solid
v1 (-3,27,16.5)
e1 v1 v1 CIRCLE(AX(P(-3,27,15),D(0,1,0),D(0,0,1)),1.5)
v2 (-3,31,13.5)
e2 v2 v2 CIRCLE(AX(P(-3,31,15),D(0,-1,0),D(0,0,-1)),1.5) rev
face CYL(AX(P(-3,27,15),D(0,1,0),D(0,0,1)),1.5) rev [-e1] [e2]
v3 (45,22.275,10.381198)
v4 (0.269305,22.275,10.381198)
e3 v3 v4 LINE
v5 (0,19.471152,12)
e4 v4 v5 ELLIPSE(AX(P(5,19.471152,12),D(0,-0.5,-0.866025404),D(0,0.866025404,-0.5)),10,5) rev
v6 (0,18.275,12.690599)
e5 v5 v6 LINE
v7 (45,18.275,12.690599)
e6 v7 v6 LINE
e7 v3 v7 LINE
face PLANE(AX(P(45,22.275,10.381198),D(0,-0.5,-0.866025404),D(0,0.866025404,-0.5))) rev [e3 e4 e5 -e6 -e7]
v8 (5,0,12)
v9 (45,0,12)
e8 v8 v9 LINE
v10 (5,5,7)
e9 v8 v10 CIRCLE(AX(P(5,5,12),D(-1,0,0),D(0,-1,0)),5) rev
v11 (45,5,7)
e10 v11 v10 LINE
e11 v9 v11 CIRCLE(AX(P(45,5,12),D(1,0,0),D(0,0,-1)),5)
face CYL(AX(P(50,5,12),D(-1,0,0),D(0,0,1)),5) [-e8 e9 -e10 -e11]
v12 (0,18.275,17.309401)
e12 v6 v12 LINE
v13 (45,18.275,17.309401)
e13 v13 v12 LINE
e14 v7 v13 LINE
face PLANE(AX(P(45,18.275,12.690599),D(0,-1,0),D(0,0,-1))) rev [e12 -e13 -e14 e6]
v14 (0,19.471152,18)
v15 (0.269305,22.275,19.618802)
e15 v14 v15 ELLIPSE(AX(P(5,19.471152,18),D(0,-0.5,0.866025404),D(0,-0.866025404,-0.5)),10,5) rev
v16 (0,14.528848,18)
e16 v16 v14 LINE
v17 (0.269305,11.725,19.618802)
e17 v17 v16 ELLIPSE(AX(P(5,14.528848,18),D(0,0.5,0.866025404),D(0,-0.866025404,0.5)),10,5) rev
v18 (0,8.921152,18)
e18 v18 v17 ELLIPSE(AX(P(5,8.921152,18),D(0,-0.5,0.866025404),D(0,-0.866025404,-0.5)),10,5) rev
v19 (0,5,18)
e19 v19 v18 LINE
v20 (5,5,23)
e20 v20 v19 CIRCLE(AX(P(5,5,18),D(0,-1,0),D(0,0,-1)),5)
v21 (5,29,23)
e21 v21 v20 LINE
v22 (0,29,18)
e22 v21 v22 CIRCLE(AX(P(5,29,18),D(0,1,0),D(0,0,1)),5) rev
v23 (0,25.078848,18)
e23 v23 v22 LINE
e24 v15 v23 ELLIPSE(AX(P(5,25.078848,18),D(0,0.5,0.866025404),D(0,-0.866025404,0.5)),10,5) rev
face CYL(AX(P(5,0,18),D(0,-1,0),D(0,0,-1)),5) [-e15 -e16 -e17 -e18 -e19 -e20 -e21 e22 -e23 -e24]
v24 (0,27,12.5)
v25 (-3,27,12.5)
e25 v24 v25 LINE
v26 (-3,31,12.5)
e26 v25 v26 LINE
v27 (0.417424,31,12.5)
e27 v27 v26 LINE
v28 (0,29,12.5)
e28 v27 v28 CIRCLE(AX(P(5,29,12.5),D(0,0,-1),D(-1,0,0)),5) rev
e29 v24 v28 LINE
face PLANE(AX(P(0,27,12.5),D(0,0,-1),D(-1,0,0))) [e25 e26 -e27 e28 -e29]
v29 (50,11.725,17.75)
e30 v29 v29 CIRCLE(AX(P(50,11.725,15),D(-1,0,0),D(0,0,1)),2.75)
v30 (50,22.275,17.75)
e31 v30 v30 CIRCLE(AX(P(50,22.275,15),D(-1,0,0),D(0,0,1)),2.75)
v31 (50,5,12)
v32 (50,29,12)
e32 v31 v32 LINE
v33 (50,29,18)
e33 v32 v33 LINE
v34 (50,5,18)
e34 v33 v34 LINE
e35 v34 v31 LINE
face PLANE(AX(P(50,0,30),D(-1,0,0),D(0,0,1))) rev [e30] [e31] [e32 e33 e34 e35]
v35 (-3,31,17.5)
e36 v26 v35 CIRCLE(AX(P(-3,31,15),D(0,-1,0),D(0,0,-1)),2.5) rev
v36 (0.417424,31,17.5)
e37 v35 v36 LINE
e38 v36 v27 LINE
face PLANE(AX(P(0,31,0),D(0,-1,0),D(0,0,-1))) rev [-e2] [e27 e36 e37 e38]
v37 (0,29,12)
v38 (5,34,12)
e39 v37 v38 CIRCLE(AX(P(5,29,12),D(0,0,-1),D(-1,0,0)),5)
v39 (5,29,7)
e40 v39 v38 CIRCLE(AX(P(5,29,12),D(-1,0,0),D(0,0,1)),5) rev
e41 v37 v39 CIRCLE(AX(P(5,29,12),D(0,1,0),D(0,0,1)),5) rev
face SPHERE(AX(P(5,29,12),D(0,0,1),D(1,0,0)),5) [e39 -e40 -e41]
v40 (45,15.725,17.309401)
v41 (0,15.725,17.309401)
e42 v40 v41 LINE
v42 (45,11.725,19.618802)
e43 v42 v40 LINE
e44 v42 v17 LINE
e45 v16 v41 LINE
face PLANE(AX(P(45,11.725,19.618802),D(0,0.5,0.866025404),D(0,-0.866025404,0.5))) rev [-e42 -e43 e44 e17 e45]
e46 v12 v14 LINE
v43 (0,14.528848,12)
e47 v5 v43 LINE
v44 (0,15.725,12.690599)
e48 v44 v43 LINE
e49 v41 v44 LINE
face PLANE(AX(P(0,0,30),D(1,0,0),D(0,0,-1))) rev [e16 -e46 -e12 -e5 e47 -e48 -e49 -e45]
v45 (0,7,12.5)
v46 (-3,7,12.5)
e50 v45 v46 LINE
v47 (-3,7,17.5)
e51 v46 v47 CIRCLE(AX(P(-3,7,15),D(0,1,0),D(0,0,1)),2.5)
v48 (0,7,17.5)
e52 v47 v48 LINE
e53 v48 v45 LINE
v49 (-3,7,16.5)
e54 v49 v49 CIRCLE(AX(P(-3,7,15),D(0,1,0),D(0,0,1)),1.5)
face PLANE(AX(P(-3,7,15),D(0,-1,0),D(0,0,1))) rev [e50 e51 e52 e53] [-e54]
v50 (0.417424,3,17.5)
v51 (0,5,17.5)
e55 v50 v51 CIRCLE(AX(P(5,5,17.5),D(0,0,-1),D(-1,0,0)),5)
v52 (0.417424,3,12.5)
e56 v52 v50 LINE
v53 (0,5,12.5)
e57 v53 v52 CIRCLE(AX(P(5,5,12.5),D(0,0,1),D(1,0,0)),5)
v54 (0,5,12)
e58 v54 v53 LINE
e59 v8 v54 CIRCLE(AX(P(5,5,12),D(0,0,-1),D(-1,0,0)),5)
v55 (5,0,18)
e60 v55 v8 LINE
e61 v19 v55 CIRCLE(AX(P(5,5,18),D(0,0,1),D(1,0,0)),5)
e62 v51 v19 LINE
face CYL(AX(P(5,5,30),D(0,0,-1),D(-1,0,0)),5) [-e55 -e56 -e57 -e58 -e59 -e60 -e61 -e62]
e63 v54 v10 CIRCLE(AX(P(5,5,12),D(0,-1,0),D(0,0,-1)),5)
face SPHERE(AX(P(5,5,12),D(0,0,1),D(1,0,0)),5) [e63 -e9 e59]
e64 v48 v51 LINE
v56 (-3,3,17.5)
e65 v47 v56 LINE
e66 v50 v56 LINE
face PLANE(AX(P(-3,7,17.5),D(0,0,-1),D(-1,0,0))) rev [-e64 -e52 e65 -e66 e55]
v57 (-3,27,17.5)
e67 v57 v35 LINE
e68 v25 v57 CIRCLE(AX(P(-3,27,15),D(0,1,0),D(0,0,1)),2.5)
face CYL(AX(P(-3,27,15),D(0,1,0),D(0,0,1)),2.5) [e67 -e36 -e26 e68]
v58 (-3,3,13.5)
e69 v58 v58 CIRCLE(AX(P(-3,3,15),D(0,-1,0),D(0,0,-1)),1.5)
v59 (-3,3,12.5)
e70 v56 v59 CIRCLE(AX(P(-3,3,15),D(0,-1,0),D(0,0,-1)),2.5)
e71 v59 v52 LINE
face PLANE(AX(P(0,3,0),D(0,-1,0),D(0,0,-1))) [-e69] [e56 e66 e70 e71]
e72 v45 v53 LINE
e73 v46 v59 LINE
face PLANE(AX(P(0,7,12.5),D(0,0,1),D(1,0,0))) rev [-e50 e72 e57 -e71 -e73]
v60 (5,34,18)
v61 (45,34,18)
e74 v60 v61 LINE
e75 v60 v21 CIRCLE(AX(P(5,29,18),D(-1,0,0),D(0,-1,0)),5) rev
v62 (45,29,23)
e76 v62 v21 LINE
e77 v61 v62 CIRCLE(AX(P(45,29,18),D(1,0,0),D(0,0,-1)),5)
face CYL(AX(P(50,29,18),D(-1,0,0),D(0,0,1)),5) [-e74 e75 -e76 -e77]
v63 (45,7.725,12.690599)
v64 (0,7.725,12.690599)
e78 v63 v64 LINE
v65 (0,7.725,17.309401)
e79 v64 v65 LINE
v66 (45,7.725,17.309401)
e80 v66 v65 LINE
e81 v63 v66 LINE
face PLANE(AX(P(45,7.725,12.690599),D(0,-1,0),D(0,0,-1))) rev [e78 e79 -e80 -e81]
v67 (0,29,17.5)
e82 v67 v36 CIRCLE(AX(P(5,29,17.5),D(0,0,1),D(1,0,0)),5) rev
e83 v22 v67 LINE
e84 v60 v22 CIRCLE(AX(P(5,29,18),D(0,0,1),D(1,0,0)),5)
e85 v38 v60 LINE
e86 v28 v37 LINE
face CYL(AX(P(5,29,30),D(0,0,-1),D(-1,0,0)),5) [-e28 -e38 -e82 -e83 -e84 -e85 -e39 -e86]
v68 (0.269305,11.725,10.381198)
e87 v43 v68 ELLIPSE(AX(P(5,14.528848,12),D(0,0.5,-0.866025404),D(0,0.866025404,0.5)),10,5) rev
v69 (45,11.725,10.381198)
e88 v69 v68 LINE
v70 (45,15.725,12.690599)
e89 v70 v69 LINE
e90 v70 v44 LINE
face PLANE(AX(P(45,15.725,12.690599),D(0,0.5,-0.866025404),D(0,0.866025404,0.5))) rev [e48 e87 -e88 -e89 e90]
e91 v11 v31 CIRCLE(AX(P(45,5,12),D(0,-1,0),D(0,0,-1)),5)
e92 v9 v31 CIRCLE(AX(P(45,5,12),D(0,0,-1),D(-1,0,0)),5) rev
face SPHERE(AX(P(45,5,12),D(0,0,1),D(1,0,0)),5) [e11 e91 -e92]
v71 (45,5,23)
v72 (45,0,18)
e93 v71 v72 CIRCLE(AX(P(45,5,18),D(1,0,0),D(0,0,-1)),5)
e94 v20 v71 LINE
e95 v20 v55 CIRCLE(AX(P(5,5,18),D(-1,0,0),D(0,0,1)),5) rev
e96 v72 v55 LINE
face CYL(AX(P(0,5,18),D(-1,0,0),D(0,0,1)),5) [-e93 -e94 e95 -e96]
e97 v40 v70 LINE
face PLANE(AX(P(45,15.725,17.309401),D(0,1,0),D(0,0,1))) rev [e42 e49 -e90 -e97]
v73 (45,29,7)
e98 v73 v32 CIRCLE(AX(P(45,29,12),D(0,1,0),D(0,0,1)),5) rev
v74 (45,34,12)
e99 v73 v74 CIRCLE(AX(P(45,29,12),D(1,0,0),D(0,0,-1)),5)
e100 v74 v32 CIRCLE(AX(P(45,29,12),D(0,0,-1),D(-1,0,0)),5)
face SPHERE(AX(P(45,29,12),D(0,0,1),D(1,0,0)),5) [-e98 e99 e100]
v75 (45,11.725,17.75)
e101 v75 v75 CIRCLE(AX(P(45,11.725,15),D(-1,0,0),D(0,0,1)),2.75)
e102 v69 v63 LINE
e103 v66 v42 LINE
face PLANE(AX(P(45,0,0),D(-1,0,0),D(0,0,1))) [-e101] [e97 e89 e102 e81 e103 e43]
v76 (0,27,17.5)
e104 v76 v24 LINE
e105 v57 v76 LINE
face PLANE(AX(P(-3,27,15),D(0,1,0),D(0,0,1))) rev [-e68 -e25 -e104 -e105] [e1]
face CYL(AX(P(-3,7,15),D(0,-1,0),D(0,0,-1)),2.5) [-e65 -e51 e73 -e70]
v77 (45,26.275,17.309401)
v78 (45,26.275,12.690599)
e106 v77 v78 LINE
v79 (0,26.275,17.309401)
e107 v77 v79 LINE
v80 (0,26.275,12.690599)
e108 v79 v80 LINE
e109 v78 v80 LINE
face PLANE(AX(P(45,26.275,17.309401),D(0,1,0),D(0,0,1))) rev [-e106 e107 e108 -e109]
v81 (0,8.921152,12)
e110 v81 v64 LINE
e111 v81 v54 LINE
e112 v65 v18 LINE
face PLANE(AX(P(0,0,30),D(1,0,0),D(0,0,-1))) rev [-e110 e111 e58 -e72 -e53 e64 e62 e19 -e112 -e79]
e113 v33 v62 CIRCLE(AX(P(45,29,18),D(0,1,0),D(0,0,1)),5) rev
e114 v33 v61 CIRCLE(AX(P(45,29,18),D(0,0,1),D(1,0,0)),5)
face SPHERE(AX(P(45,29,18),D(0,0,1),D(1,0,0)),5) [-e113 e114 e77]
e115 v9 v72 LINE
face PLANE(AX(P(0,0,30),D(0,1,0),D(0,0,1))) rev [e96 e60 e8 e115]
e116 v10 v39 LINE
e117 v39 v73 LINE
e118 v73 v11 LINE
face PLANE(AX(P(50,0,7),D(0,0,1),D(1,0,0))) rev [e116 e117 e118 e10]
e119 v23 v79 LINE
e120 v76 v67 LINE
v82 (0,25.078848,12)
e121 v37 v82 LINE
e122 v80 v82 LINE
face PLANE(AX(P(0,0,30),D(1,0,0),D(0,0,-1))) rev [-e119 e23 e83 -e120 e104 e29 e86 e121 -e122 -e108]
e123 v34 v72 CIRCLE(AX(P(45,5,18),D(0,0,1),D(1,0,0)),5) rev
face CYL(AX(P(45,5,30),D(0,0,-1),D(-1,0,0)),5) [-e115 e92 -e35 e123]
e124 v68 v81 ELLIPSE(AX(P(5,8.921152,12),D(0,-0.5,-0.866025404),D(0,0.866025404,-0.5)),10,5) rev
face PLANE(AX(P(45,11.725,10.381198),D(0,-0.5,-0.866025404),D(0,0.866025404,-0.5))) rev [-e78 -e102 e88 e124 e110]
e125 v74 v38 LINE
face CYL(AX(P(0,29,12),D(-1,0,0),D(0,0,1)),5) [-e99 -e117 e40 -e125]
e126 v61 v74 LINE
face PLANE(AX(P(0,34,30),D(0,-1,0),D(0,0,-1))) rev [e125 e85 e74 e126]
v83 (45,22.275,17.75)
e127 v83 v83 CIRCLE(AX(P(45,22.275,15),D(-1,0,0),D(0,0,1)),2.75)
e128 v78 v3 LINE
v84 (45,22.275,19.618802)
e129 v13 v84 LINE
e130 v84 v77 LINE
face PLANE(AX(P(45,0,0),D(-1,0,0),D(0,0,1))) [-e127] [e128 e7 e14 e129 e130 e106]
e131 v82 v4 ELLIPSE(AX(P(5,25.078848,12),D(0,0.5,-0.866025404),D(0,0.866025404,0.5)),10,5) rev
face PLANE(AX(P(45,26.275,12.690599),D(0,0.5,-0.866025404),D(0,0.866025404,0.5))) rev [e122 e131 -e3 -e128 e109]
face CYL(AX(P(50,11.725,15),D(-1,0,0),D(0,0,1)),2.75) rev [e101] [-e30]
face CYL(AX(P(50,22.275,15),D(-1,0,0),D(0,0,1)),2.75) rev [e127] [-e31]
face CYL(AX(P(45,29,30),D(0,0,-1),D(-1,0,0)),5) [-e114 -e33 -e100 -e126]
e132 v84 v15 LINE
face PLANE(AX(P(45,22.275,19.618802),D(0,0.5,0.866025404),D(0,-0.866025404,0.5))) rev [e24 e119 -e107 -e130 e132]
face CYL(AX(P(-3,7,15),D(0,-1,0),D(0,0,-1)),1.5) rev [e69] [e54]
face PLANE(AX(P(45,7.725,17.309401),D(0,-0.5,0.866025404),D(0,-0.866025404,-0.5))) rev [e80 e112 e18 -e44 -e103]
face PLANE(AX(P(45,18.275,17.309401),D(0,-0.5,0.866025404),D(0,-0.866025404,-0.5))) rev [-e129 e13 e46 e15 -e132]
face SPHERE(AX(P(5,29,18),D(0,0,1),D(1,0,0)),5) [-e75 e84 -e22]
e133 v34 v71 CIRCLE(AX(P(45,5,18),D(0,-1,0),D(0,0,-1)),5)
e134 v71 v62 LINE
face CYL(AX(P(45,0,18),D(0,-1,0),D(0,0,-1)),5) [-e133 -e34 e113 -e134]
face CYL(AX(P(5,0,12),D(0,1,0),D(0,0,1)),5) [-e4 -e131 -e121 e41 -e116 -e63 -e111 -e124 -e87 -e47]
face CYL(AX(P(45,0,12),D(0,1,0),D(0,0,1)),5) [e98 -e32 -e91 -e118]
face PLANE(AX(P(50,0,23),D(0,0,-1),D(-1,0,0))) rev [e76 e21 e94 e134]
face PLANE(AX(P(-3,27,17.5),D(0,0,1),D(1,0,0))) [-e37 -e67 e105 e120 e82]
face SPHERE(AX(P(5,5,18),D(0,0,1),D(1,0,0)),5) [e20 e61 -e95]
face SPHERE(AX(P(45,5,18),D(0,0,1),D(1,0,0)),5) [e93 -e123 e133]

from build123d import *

# Parameters (mm, degrees)
ESQUISSE1_W              = 50
ESQUISSE1_H              = 34
BOSS_EXTRU_1_DEPTH       = 30
ESQUISSE10_R             = 1.5
BOSS_EXTRU_3_DEPTH       = 7
ENL_V_MAT_EXTRU_6_DEPTH  = 45
ESQUISSE12_R             = 2.75
ENL_V_MAT_EXTRU_7_DEPTH  = 68.498148123
ESQUISSE13_W             = 7
ESQUISSE13_H             = 34
ENL_V_MAT_EXTRU_8_DEPTH  = 68.498148123
ESQUISSE15_W             = 7.132262806
ESQUISSE15_H             = 5.57489061
ENL_V_MAT_EXTRU_9_DEPTH  = 3
ENL_V_MAT_EXTRU_10_DEPTH = 3
CONG_1_R                 = 5


with BuildPart() as part:
    # Esquisse1 → Boss.-Extru.1 (new body)
    with BuildSketch(Plane.XY):
        with Locations((25, 17)):
            Rectangle(ESQUISSE1_W, ESQUISSE1_H)
    extrude(amount=BOSS_EXTRU_1_DEPTH)

    # Esquisse10 → Boss.-Extru.3 (add)
    with BuildSketch(Plane(origin=(0, 34, 0), x_dir=(1, 0, 0), z_dir=(0, 1, 0))):
        with BuildLine():
            Line((0, -12.5), (0, -17.5))
            Line((0, -17.5), (-3, -17.5))
            ThreePointArc((-3, -17.5), (-5.5, -15), (-3, -12.5))
            Line((-3, -12.5), (0, -12.5))
        make_face()
        with Locations(Location((-3, -15, 0), (0, 0, 270))):
            Circle(ESQUISSE10_R, mode=Mode.SUBTRACT)
    boss_extru_3 = extrude(amount=-BOSS_EXTRU_3_DEPTH)

    # Symétrie2: Boss.-Extru.3 across plane
    add(boss_extru_3.mirror(Plane.ZX.offset(17)))

    # Esquisse11 → Enlèv. mat.-Extru.6 (cut)
    with BuildSketch(Plane.ZY):
        Polygon((10.381197846, 11.725), (12.690598923, 7.725), (17.309401077, 7.725), (19.618802154, 11.725), (17.309401077, 15.725), (12.690598923, 15.725), align=None)
        Polygon((10.381197846, 22.275), (12.690598923, 18.275), (17.309401077, 18.275), (19.618802154, 22.275), (17.309401077, 26.275), (12.690598923, 26.275), align=None)
    extrude(amount=-ENL_V_MAT_EXTRU_6_DEPTH, mode=Mode.SUBTRACT)

    # Esquisse12 → Enlèv. mat.-Extru.7 (cut, through all)
    with BuildSketch(Plane.ZY):
        with Locations((15, 11.725)):
            Circle(ESQUISSE12_R)
        with Locations((15, 22.275)):
            Circle(ESQUISSE12_R)
    extrude(amount=-ENL_V_MAT_EXTRU_7_DEPTH, mode=Mode.SUBTRACT)

    # Esquisse13 → Enlèv. mat.-Extru.8 (cut, through all)
    with BuildSketch(Plane.ZY):
        with Locations((3.5, 17)):
            Rectangle(ESQUISSE13_W, ESQUISSE13_H)
        with Locations((26.5, 17)):
            Rectangle(ESQUISSE13_W, ESQUISSE13_H)
    extrude(amount=-ENL_V_MAT_EXTRU_8_DEPTH, mode=Mode.SUBTRACT)

    # Esquisse15 → Enlèv. mat.-Extru.9 (cut)
    with BuildSketch(Plane(origin=(0, 34, 0), x_dir=(1, 0, 0), z_dir=(0, 1, 0))):
        with Locations((-3.566131403, -15.287445305)):
            Rectangle(ESQUISSE15_W, ESQUISSE15_H)
    extrude(amount=-ENL_V_MAT_EXTRU_9_DEPTH, mode=Mode.SUBTRACT)

    # Esquisse16 → Enlèv. mat.-Extru.10 (cut)
    with BuildSketch(Plane.XZ):
        Polygon((-3, 18.464101615), (-6, 16.732050808), (-6, 13.267949192), (-3, 11.535898385), (0, 11.535898385), (0, 13.267949192), (0, 16.732050808), (0, 18.464101615), align=None)
    extrude(amount=-ENL_V_MAT_EXTRU_10_DEPTH, mode=Mode.SUBTRACT)

    # Congé1
    # the kernel refuses this fillet: 5 mm, written as the material it takes off along each edge
    with BuildSketch(Plane(origin=(5, 29, 18), x_dir=(0, 0, 1), z_dir=(0, 1, 0))) as cong_1_piece_1_section:
        Polygon((0, 0), (CONG_1_R, 0), (CONG_1_R, -CONG_1_R), (0, -CONG_1_R), align=None)
    cong_1_piece_1 = extrude(amount=CONG_1_R, mode=Mode.PRIVATE)
    cong_1_piece_1 = cong_1_piece_1 - Plane(origin=(5, 29, 18), x_dir=(0.7071067811865475, 0, -0.7071067811865475), z_dir=(0, 1, 0)) * Sphere(CONG_1_R, mode=Mode.PRIVATE)
    add(cong_1_piece_1, mode=Mode.SUBTRACT)
    with BuildSketch(Plane(origin=(45, 29, 18), x_dir=(0, 1, 0), z_dir=(1, 0, 0))) as cong_1_piece_2_section:
        Polygon((0, 0), (CONG_1_R, 0), (CONG_1_R, CONG_1_R), (0, CONG_1_R), align=None)
    cong_1_piece_2 = extrude(amount=CONG_1_R, mode=Mode.PRIVATE)
    cong_1_piece_2 = cong_1_piece_2 - Plane(origin=(45, 29, 18), x_dir=(0, -0.7071067811865475, -0.7071067811865475), z_dir=(1, 0, 0)) * Sphere(CONG_1_R, mode=Mode.PRIVATE)
    add(cong_1_piece_2, mode=Mode.SUBTRACT)
    with BuildSketch(Plane(origin=(5, 29, 12), x_dir=(0, 1, 0), z_dir=(0, 0, -1))) as cong_1_piece_3_section:
        Polygon((0, 0), (CONG_1_R, 0), (CONG_1_R, -CONG_1_R), (0, -CONG_1_R), align=None)
    cong_1_piece_3 = extrude(amount=CONG_1_R, mode=Mode.PRIVATE)
    cong_1_piece_3 = cong_1_piece_3 - Plane(origin=(5, 29, 12), x_dir=(0.7071067811865475, -0.7071067811865475, 0), z_dir=(0, 0, -1)) * Sphere(CONG_1_R, mode=Mode.PRIVATE)
    add(cong_1_piece_3, mode=Mode.SUBTRACT)
    with BuildSketch(Plane(origin=(45, 29, 12), x_dir=(0, 1, 0), z_dir=(0, 0, -1))) as cong_1_piece_4_section:
        Polygon((0, 0), (CONG_1_R, 0), (CONG_1_R, CONG_1_R), (0, CONG_1_R), align=None)
    cong_1_piece_4 = extrude(amount=CONG_1_R, mode=Mode.PRIVATE)
    cong_1_piece_4 = cong_1_piece_4 - Plane(origin=(45, 29, 12), x_dir=(-0.7071067811865475, -0.7071067811865475, 0), z_dir=(0, 0, -1)) * Sphere(CONG_1_R, mode=Mode.PRIVATE)
    add(cong_1_piece_4, mode=Mode.SUBTRACT)
    with BuildSketch(Plane(origin=(5, 5, 12), x_dir=(0, 0, -1), z_dir=(0, -1, 0))) as cong_1_piece_5_section:
        Polygon((0, 0), (CONG_1_R, 0), (CONG_1_R, -CONG_1_R), (0, -CONG_1_R), align=None)
    cong_1_piece_5 = extrude(amount=CONG_1_R, mode=Mode.PRIVATE)
    cong_1_piece_5 = cong_1_piece_5 - Plane(origin=(5, 5, 12), x_dir=(0.7071067811865475, 0, 0.7071067811865475), z_dir=(0, -1, 0)) * Sphere(CONG_1_R, mode=Mode.PRIVATE)
    add(cong_1_piece_5, mode=Mode.SUBTRACT)
    with BuildSketch(Plane(origin=(45, 5, 12), x_dir=(0, 0, -1), z_dir=(0, -1, 0))) as cong_1_piece_6_section:
        Polygon((0, 0), (CONG_1_R, 0), (CONG_1_R, CONG_1_R), (0, CONG_1_R), align=None)
    cong_1_piece_6 = extrude(amount=CONG_1_R, mode=Mode.PRIVATE)
    cong_1_piece_6 = cong_1_piece_6 - Plane(origin=(45, 5, 12), x_dir=(-0.7071067811865475, 0, 0.7071067811865475), z_dir=(0, -1, 0)) * Sphere(CONG_1_R, mode=Mode.PRIVATE)
    add(cong_1_piece_6, mode=Mode.SUBTRACT)
    with BuildSketch(Plane(origin=(5, 5, 18), x_dir=(0, 0, 1), z_dir=(0, -1, 0))) as cong_1_piece_7_section:
        Polygon((0, 0), (CONG_1_R, 0), (CONG_1_R, CONG_1_R), (0, CONG_1_R), align=None)
    cong_1_piece_7 = extrude(amount=CONG_1_R, mode=Mode.PRIVATE)
    cong_1_piece_7 = cong_1_piece_7 - Plane(origin=(5, 5, 18), x_dir=(0.7071067811865475, 0, -0.7071067811865475), z_dir=(0, -1, 0)) * Sphere(CONG_1_R, mode=Mode.PRIVATE)
    add(cong_1_piece_7, mode=Mode.SUBTRACT)
    with BuildSketch(Plane(origin=(45, 5, 18), x_dir=(1, 0, 0), z_dir=(0, -1, 0))) as cong_1_piece_8_section:
        Polygon((0, 0), (CONG_1_R, 0), (CONG_1_R, CONG_1_R), (0, CONG_1_R), align=None)
    cong_1_piece_8 = extrude(amount=CONG_1_R, mode=Mode.PRIVATE)
    cong_1_piece_8 = cong_1_piece_8 - Plane(origin=(45, 5, 18), x_dir=(-0.7071067811865475, 0, -0.7071067811865475), z_dir=(0, -1, 0)) * Sphere(CONG_1_R, mode=Mode.PRIVATE)
    add(cong_1_piece_8, mode=Mode.SUBTRACT)
    with BuildSketch(Plane(origin=(5, 34, 23), x_dir=(0, 0, -1), z_dir=(1, 0, 0)), Plane(origin=(5, 0, 7), x_dir=(0, 0, 1), z_dir=(1, 0, 0))) as cong_1_piece_9:
        with BuildLine():
            CenterArc((CONG_1_R, -CONG_1_R), CONG_1_R, 90, 90)
            Line((0, -CONG_1_R), (0, 0))
            Line((0, 0), (CONG_1_R, 0))
        make_face()
    extrude(amount=40, mode=Mode.SUBTRACT)
    with BuildSketch(Plane(origin=(5, 34, 7), x_dir=(0, 0, 1), z_dir=(1, 0, 0)), Plane(origin=(5, 0, 23), x_dir=(0, 0, -1), z_dir=(1, 0, 0))) as cong_1_piece_10:
        with BuildLine():
            CenterArc((CONG_1_R, CONG_1_R), CONG_1_R, 180, 90)
            Line((0, CONG_1_R), (0, 0))
            Line((0, 0), (CONG_1_R, 0))
        make_face()
    extrude(amount=40, mode=Mode.SUBTRACT)
    with BuildSketch(Plane(origin=(0, 5, 23), x_dir=(1, 0, 0), z_dir=(0, 1, 0)), Plane(origin=(0, 5, 7), x_dir=(0, 0, 1), z_dir=(0, 1, 0)), Plane(origin=(50, 5, 23), x_dir=(0, 0, -1), z_dir=(0, 1, 0))) as cong_1_piece_11:
        with BuildLine():
            CenterArc((CONG_1_R, CONG_1_R), CONG_1_R, 180, 90)
            Line((0, CONG_1_R), (0, 0))
            Line((0, 0), (CONG_1_R, 0))
        make_face()
    extrude(amount=24, mode=Mode.SUBTRACT)
    with BuildSketch(Plane(origin=(0, 34, 18), x_dir=(1, 0, 0), z_dir=(0, 0, -1))) as cong_1_piece_12_section:
        with BuildLine():
            CenterArc((CONG_1_R, CONG_1_R), CONG_1_R, 180, 90)
            Line((0, CONG_1_R), (0, 0))
            Line((0, 0), (CONG_1_R, 0))
        make_face()
    cong_1_piece_12 = extrude(amount=6, mode=Mode.PRIVATE)
    cong_1_piece_12 = split(cong_1_piece_12, bisect_by=Plane(origin=(1.218725878, 33.074749682, 17.5), z_dir=(0, 0, 1)), keep=Keep.TOP, mode=Mode.PRIVATE)
    cong_1_piece_12 = split(cong_1_piece_12, bisect_by=Plane(origin=(1.218725878, 31, 17.75), z_dir=(0, 1, 0)), keep=Keep.TOP, mode=Mode.PRIVATE)
    add(cong_1_piece_12, mode=Mode.SUBTRACT)
    with BuildSketch(Plane(origin=(0, 34, 18), x_dir=(1, 0, 0), z_dir=(0, 0, -1))) as cong_1_piece_13_section:
        with BuildLine():
            CenterArc((CONG_1_R, CONG_1_R), CONG_1_R, 180, 90)
            Line((0, CONG_1_R), (0, 0))
            Line((0, 0), (CONG_1_R, 0))
        make_face()
    cong_1_piece_13 = extrude(amount=6, mode=Mode.PRIVATE)
    cong_1_piece_13 = split(cong_1_piece_13, bisect_by=Plane(origin=(0.05065924, 30.291256669, 17.5), z_dir=(0, 0, 1)), keep=Keep.TOP, mode=Mode.PRIVATE)
    cong_1_piece_13 = split(cong_1_piece_13, bisect_by=Plane(origin=(0.05065924, 31, 17.75), z_dir=(0, -1, 0)), keep=Keep.TOP, mode=Mode.PRIVATE)
    add(cong_1_piece_13, mode=Mode.SUBTRACT)
    with BuildSketch(Plane(origin=(0, 34, 18), x_dir=(1, 0, 0), z_dir=(0, 0, -1))) as cong_1_piece_14_section:
        with BuildLine():
            CenterArc((CONG_1_R, CONG_1_R), CONG_1_R, 180, 90)
            Line((0, CONG_1_R), (0, 0))
            Line((0, 0), (CONG_1_R, 0))
        make_face()
    cong_1_piece_14 = extrude(amount=6, mode=Mode.PRIVATE)
    cong_1_piece_14 = split(cong_1_piece_14, bisect_by=Plane(origin=(1.218725878, 33.074749682, 17.5), z_dir=(0, 0, -1)), keep=Keep.TOP, mode=Mode.PRIVATE)
    cong_1_piece_14 = split(cong_1_piece_14, bisect_by=Plane(origin=(1.218725878, 31, 15), z_dir=(0, 1, 0)), keep=Keep.TOP, mode=Mode.PRIVATE)
    cong_1_piece_14 = split(cong_1_piece_14, bisect_by=Plane(origin=(1.218725878, 33.074749682, 12.5), z_dir=(0, 0, 1)), keep=Keep.TOP, mode=Mode.PRIVATE)
    add(cong_1_piece_14, mode=Mode.SUBTRACT)
    with BuildSketch(Plane(origin=(0, 34, 18), x_dir=(1, 0, 0), z_dir=(0, 0, -1))) as cong_1_piece_15_section:
        with BuildLine():
            CenterArc((CONG_1_R, CONG_1_R), CONG_1_R, 180, 90)
            Line((0, CONG_1_R), (0, 0))
            Line((0, 0), (CONG_1_R, 0))
        make_face()
    cong_1_piece_15 = extrude(amount=6, mode=Mode.PRIVATE)
    cong_1_piece_15 = split(cong_1_piece_15, bisect_by=Plane(origin=(1.218725878, 31, 12.25), z_dir=(0, 1, 0)), keep=Keep.TOP, mode=Mode.PRIVATE)
    cong_1_piece_15 = split(cong_1_piece_15, bisect_by=Plane(origin=(1.218725878, 33.074749682, 12.5), z_dir=(0, 0, -1)), keep=Keep.TOP, mode=Mode.PRIVATE)
    add(cong_1_piece_15, mode=Mode.SUBTRACT)
    with BuildSketch(Plane(origin=(0, 34, 18), x_dir=(1, 0, 0), z_dir=(0, 0, -1))) as cong_1_piece_16_section:
        with BuildLine():
            CenterArc((CONG_1_R, CONG_1_R), CONG_1_R, 180, 90)
            Line((0, CONG_1_R), (0, 0))
            Line((0, 0), (CONG_1_R, 0))
        make_face()
    cong_1_piece_16 = extrude(amount=6, mode=Mode.PRIVATE)
    cong_1_piece_16 = split(cong_1_piece_16, bisect_by=Plane(origin=(0.05065924, 31, 12.25), z_dir=(0, -1, 0)), keep=Keep.TOP, mode=Mode.PRIVATE)
    cong_1_piece_16 = split(cong_1_piece_16, bisect_by=Plane(origin=(0.05065924, 30.291256669, 12.5), z_dir=(0, 0, -1)), keep=Keep.TOP, mode=Mode.PRIVATE)
    add(cong_1_piece_16, mode=Mode.SUBTRACT)
    with BuildSketch(Plane(origin=(0, 0, 18), x_dir=(1, 0, 0), z_dir=(0, 0, -1))) as cong_1_piece_17_section:
        with BuildLine():
            CenterArc((CONG_1_R, -CONG_1_R), CONG_1_R, 90, 90)
            Line((0, -CONG_1_R), (0, 0))
            Line((0, 0), (CONG_1_R, 0))
        make_face()
    cong_1_piece_17 = extrude(amount=6, mode=Mode.PRIVATE)
    cong_1_piece_17 = split(cong_1_piece_17, bisect_by=Plane(origin=(1.218725878, 3, 17.75), z_dir=(0, -1, 0)), keep=Keep.TOP, mode=Mode.PRIVATE)
    cong_1_piece_17 = split(cong_1_piece_17, bisect_by=Plane(origin=(1.218725878, 0.925250318, 17.5), z_dir=(0, 0, 1)), keep=Keep.TOP, mode=Mode.PRIVATE)
    add(cong_1_piece_17, mode=Mode.SUBTRACT)
    with BuildSketch(Plane(origin=(0, 0, 18), x_dir=(1, 0, 0), z_dir=(0, 0, -1))) as cong_1_piece_18_section:
        with BuildLine():
            CenterArc((CONG_1_R, -CONG_1_R), CONG_1_R, 90, 90)
            Line((0, -CONG_1_R), (0, 0))
            Line((0, 0), (CONG_1_R, 0))
        make_face()
    cong_1_piece_18 = extrude(amount=6, mode=Mode.PRIVATE)
    cong_1_piece_18 = split(cong_1_piece_18, bisect_by=Plane(origin=(0.05065924, 3, 17.75), z_dir=(0, 1, 0)), keep=Keep.TOP, mode=Mode.PRIVATE)
    cong_1_piece_18 = split(cong_1_piece_18, bisect_by=Plane(origin=(0.05065924, 3.708743331, 17.5), z_dir=(0, 0, 1)), keep=Keep.TOP, mode=Mode.PRIVATE)
    add(cong_1_piece_18, mode=Mode.SUBTRACT)
    with BuildSketch(Plane(origin=(0, 0, 18), x_dir=(1, 0, 0), z_dir=(0, 0, -1))) as cong_1_piece_19_section:
        with BuildLine():
            CenterArc((CONG_1_R, -CONG_1_R), CONG_1_R, 90, 90)
            Line((0, -CONG_1_R), (0, 0))
            Line((0, 0), (CONG_1_R, 0))
        make_face()
    cong_1_piece_19 = extrude(amount=6, mode=Mode.PRIVATE)
    cong_1_piece_19 = split(cong_1_piece_19, bisect_by=Plane(origin=(1.218725878, 0.925250318, 12.5), z_dir=(0, 0, 1)), keep=Keep.TOP, mode=Mode.PRIVATE)
    cong_1_piece_19 = split(cong_1_piece_19, bisect_by=Plane(origin=(1.218725878, 3, 15), z_dir=(0, -1, 0)), keep=Keep.TOP, mode=Mode.PRIVATE)
    cong_1_piece_19 = split(cong_1_piece_19, bisect_by=Plane(origin=(1.218725878, 0.925250318, 17.5), z_dir=(0, 0, -1)), keep=Keep.TOP, mode=Mode.PRIVATE)
    add(cong_1_piece_19, mode=Mode.SUBTRACT)
    with BuildSketch(Plane(origin=(0, 0, 18), x_dir=(1, 0, 0), z_dir=(0, 0, -1))) as cong_1_piece_20_section:
        with BuildLine():
            CenterArc((CONG_1_R, -CONG_1_R), CONG_1_R, 90, 90)
            Line((0, -CONG_1_R), (0, 0))
            Line((0, 0), (CONG_1_R, 0))
        make_face()
    cong_1_piece_20 = extrude(amount=6, mode=Mode.PRIVATE)
    cong_1_piece_20 = split(cong_1_piece_20, bisect_by=Plane(origin=(1.218725878, 0.925250318, 12.5), z_dir=(0, 0, -1)), keep=Keep.TOP, mode=Mode.PRIVATE)
    cong_1_piece_20 = split(cong_1_piece_20, bisect_by=Plane(origin=(1.218725878, 3, 12.25), z_dir=(0, -1, 0)), keep=Keep.TOP, mode=Mode.PRIVATE)
    add(cong_1_piece_20, mode=Mode.SUBTRACT)
    with BuildSketch(Plane(origin=(0, 0, 18), x_dir=(1, 0, 0), z_dir=(0, 0, -1))) as cong_1_piece_21_section:
        with BuildLine():
            CenterArc((CONG_1_R, -CONG_1_R), CONG_1_R, 90, 90)
            Line((0, -CONG_1_R), (0, 0))
            Line((0, 0), (CONG_1_R, 0))
        make_face()
    cong_1_piece_21 = extrude(amount=6, mode=Mode.PRIVATE)
    cong_1_piece_21 = split(cong_1_piece_21, bisect_by=Plane(origin=(0.05065924, 3.708743331, 12.5), z_dir=(0, 0, -1)), keep=Keep.TOP, mode=Mode.PRIVATE)
    cong_1_piece_21 = split(cong_1_piece_21, bisect_by=Plane(origin=(0.05065924, 3, 12.25), z_dir=(0, 1, 0)), keep=Keep.TOP, mode=Mode.PRIVATE)
    add(cong_1_piece_21, mode=Mode.SUBTRACT)
    with BuildSketch(Plane(origin=(50, 0, 12), x_dir=(-1, 0, 0), z_dir=(0, 0, 1)), Plane(origin=(50, 34, 12), x_dir=(0, -1, 0), z_dir=(0, 0, 1))) as cong_1_piece_22:
        with BuildLine():
            CenterArc((CONG_1_R, -CONG_1_R), CONG_1_R, 90, 90)
            Line((0, -CONG_1_R), (0, 0))
            Line((0, 0), (CONG_1_R, 0))
        make_face()
    extrude(amount=6, mode=Mode.SUBTRACT)
    with BuildSketch(Plane(origin=(50, 5, 7), x_dir=(0, 0, 1), z_dir=(0, 1, 0))) as cong_1_piece_23:
        with BuildLine():
            CenterArc((CONG_1_R, -CONG_1_R), CONG_1_R, 90, 90)
            Line((0, -CONG_1_R), (0, 0))
            Line((0, 0), (CONG_1_R, 0))
        make_face()
    extrude(amount=24, mode=Mode.SUBTRACT)


solid = part.part
